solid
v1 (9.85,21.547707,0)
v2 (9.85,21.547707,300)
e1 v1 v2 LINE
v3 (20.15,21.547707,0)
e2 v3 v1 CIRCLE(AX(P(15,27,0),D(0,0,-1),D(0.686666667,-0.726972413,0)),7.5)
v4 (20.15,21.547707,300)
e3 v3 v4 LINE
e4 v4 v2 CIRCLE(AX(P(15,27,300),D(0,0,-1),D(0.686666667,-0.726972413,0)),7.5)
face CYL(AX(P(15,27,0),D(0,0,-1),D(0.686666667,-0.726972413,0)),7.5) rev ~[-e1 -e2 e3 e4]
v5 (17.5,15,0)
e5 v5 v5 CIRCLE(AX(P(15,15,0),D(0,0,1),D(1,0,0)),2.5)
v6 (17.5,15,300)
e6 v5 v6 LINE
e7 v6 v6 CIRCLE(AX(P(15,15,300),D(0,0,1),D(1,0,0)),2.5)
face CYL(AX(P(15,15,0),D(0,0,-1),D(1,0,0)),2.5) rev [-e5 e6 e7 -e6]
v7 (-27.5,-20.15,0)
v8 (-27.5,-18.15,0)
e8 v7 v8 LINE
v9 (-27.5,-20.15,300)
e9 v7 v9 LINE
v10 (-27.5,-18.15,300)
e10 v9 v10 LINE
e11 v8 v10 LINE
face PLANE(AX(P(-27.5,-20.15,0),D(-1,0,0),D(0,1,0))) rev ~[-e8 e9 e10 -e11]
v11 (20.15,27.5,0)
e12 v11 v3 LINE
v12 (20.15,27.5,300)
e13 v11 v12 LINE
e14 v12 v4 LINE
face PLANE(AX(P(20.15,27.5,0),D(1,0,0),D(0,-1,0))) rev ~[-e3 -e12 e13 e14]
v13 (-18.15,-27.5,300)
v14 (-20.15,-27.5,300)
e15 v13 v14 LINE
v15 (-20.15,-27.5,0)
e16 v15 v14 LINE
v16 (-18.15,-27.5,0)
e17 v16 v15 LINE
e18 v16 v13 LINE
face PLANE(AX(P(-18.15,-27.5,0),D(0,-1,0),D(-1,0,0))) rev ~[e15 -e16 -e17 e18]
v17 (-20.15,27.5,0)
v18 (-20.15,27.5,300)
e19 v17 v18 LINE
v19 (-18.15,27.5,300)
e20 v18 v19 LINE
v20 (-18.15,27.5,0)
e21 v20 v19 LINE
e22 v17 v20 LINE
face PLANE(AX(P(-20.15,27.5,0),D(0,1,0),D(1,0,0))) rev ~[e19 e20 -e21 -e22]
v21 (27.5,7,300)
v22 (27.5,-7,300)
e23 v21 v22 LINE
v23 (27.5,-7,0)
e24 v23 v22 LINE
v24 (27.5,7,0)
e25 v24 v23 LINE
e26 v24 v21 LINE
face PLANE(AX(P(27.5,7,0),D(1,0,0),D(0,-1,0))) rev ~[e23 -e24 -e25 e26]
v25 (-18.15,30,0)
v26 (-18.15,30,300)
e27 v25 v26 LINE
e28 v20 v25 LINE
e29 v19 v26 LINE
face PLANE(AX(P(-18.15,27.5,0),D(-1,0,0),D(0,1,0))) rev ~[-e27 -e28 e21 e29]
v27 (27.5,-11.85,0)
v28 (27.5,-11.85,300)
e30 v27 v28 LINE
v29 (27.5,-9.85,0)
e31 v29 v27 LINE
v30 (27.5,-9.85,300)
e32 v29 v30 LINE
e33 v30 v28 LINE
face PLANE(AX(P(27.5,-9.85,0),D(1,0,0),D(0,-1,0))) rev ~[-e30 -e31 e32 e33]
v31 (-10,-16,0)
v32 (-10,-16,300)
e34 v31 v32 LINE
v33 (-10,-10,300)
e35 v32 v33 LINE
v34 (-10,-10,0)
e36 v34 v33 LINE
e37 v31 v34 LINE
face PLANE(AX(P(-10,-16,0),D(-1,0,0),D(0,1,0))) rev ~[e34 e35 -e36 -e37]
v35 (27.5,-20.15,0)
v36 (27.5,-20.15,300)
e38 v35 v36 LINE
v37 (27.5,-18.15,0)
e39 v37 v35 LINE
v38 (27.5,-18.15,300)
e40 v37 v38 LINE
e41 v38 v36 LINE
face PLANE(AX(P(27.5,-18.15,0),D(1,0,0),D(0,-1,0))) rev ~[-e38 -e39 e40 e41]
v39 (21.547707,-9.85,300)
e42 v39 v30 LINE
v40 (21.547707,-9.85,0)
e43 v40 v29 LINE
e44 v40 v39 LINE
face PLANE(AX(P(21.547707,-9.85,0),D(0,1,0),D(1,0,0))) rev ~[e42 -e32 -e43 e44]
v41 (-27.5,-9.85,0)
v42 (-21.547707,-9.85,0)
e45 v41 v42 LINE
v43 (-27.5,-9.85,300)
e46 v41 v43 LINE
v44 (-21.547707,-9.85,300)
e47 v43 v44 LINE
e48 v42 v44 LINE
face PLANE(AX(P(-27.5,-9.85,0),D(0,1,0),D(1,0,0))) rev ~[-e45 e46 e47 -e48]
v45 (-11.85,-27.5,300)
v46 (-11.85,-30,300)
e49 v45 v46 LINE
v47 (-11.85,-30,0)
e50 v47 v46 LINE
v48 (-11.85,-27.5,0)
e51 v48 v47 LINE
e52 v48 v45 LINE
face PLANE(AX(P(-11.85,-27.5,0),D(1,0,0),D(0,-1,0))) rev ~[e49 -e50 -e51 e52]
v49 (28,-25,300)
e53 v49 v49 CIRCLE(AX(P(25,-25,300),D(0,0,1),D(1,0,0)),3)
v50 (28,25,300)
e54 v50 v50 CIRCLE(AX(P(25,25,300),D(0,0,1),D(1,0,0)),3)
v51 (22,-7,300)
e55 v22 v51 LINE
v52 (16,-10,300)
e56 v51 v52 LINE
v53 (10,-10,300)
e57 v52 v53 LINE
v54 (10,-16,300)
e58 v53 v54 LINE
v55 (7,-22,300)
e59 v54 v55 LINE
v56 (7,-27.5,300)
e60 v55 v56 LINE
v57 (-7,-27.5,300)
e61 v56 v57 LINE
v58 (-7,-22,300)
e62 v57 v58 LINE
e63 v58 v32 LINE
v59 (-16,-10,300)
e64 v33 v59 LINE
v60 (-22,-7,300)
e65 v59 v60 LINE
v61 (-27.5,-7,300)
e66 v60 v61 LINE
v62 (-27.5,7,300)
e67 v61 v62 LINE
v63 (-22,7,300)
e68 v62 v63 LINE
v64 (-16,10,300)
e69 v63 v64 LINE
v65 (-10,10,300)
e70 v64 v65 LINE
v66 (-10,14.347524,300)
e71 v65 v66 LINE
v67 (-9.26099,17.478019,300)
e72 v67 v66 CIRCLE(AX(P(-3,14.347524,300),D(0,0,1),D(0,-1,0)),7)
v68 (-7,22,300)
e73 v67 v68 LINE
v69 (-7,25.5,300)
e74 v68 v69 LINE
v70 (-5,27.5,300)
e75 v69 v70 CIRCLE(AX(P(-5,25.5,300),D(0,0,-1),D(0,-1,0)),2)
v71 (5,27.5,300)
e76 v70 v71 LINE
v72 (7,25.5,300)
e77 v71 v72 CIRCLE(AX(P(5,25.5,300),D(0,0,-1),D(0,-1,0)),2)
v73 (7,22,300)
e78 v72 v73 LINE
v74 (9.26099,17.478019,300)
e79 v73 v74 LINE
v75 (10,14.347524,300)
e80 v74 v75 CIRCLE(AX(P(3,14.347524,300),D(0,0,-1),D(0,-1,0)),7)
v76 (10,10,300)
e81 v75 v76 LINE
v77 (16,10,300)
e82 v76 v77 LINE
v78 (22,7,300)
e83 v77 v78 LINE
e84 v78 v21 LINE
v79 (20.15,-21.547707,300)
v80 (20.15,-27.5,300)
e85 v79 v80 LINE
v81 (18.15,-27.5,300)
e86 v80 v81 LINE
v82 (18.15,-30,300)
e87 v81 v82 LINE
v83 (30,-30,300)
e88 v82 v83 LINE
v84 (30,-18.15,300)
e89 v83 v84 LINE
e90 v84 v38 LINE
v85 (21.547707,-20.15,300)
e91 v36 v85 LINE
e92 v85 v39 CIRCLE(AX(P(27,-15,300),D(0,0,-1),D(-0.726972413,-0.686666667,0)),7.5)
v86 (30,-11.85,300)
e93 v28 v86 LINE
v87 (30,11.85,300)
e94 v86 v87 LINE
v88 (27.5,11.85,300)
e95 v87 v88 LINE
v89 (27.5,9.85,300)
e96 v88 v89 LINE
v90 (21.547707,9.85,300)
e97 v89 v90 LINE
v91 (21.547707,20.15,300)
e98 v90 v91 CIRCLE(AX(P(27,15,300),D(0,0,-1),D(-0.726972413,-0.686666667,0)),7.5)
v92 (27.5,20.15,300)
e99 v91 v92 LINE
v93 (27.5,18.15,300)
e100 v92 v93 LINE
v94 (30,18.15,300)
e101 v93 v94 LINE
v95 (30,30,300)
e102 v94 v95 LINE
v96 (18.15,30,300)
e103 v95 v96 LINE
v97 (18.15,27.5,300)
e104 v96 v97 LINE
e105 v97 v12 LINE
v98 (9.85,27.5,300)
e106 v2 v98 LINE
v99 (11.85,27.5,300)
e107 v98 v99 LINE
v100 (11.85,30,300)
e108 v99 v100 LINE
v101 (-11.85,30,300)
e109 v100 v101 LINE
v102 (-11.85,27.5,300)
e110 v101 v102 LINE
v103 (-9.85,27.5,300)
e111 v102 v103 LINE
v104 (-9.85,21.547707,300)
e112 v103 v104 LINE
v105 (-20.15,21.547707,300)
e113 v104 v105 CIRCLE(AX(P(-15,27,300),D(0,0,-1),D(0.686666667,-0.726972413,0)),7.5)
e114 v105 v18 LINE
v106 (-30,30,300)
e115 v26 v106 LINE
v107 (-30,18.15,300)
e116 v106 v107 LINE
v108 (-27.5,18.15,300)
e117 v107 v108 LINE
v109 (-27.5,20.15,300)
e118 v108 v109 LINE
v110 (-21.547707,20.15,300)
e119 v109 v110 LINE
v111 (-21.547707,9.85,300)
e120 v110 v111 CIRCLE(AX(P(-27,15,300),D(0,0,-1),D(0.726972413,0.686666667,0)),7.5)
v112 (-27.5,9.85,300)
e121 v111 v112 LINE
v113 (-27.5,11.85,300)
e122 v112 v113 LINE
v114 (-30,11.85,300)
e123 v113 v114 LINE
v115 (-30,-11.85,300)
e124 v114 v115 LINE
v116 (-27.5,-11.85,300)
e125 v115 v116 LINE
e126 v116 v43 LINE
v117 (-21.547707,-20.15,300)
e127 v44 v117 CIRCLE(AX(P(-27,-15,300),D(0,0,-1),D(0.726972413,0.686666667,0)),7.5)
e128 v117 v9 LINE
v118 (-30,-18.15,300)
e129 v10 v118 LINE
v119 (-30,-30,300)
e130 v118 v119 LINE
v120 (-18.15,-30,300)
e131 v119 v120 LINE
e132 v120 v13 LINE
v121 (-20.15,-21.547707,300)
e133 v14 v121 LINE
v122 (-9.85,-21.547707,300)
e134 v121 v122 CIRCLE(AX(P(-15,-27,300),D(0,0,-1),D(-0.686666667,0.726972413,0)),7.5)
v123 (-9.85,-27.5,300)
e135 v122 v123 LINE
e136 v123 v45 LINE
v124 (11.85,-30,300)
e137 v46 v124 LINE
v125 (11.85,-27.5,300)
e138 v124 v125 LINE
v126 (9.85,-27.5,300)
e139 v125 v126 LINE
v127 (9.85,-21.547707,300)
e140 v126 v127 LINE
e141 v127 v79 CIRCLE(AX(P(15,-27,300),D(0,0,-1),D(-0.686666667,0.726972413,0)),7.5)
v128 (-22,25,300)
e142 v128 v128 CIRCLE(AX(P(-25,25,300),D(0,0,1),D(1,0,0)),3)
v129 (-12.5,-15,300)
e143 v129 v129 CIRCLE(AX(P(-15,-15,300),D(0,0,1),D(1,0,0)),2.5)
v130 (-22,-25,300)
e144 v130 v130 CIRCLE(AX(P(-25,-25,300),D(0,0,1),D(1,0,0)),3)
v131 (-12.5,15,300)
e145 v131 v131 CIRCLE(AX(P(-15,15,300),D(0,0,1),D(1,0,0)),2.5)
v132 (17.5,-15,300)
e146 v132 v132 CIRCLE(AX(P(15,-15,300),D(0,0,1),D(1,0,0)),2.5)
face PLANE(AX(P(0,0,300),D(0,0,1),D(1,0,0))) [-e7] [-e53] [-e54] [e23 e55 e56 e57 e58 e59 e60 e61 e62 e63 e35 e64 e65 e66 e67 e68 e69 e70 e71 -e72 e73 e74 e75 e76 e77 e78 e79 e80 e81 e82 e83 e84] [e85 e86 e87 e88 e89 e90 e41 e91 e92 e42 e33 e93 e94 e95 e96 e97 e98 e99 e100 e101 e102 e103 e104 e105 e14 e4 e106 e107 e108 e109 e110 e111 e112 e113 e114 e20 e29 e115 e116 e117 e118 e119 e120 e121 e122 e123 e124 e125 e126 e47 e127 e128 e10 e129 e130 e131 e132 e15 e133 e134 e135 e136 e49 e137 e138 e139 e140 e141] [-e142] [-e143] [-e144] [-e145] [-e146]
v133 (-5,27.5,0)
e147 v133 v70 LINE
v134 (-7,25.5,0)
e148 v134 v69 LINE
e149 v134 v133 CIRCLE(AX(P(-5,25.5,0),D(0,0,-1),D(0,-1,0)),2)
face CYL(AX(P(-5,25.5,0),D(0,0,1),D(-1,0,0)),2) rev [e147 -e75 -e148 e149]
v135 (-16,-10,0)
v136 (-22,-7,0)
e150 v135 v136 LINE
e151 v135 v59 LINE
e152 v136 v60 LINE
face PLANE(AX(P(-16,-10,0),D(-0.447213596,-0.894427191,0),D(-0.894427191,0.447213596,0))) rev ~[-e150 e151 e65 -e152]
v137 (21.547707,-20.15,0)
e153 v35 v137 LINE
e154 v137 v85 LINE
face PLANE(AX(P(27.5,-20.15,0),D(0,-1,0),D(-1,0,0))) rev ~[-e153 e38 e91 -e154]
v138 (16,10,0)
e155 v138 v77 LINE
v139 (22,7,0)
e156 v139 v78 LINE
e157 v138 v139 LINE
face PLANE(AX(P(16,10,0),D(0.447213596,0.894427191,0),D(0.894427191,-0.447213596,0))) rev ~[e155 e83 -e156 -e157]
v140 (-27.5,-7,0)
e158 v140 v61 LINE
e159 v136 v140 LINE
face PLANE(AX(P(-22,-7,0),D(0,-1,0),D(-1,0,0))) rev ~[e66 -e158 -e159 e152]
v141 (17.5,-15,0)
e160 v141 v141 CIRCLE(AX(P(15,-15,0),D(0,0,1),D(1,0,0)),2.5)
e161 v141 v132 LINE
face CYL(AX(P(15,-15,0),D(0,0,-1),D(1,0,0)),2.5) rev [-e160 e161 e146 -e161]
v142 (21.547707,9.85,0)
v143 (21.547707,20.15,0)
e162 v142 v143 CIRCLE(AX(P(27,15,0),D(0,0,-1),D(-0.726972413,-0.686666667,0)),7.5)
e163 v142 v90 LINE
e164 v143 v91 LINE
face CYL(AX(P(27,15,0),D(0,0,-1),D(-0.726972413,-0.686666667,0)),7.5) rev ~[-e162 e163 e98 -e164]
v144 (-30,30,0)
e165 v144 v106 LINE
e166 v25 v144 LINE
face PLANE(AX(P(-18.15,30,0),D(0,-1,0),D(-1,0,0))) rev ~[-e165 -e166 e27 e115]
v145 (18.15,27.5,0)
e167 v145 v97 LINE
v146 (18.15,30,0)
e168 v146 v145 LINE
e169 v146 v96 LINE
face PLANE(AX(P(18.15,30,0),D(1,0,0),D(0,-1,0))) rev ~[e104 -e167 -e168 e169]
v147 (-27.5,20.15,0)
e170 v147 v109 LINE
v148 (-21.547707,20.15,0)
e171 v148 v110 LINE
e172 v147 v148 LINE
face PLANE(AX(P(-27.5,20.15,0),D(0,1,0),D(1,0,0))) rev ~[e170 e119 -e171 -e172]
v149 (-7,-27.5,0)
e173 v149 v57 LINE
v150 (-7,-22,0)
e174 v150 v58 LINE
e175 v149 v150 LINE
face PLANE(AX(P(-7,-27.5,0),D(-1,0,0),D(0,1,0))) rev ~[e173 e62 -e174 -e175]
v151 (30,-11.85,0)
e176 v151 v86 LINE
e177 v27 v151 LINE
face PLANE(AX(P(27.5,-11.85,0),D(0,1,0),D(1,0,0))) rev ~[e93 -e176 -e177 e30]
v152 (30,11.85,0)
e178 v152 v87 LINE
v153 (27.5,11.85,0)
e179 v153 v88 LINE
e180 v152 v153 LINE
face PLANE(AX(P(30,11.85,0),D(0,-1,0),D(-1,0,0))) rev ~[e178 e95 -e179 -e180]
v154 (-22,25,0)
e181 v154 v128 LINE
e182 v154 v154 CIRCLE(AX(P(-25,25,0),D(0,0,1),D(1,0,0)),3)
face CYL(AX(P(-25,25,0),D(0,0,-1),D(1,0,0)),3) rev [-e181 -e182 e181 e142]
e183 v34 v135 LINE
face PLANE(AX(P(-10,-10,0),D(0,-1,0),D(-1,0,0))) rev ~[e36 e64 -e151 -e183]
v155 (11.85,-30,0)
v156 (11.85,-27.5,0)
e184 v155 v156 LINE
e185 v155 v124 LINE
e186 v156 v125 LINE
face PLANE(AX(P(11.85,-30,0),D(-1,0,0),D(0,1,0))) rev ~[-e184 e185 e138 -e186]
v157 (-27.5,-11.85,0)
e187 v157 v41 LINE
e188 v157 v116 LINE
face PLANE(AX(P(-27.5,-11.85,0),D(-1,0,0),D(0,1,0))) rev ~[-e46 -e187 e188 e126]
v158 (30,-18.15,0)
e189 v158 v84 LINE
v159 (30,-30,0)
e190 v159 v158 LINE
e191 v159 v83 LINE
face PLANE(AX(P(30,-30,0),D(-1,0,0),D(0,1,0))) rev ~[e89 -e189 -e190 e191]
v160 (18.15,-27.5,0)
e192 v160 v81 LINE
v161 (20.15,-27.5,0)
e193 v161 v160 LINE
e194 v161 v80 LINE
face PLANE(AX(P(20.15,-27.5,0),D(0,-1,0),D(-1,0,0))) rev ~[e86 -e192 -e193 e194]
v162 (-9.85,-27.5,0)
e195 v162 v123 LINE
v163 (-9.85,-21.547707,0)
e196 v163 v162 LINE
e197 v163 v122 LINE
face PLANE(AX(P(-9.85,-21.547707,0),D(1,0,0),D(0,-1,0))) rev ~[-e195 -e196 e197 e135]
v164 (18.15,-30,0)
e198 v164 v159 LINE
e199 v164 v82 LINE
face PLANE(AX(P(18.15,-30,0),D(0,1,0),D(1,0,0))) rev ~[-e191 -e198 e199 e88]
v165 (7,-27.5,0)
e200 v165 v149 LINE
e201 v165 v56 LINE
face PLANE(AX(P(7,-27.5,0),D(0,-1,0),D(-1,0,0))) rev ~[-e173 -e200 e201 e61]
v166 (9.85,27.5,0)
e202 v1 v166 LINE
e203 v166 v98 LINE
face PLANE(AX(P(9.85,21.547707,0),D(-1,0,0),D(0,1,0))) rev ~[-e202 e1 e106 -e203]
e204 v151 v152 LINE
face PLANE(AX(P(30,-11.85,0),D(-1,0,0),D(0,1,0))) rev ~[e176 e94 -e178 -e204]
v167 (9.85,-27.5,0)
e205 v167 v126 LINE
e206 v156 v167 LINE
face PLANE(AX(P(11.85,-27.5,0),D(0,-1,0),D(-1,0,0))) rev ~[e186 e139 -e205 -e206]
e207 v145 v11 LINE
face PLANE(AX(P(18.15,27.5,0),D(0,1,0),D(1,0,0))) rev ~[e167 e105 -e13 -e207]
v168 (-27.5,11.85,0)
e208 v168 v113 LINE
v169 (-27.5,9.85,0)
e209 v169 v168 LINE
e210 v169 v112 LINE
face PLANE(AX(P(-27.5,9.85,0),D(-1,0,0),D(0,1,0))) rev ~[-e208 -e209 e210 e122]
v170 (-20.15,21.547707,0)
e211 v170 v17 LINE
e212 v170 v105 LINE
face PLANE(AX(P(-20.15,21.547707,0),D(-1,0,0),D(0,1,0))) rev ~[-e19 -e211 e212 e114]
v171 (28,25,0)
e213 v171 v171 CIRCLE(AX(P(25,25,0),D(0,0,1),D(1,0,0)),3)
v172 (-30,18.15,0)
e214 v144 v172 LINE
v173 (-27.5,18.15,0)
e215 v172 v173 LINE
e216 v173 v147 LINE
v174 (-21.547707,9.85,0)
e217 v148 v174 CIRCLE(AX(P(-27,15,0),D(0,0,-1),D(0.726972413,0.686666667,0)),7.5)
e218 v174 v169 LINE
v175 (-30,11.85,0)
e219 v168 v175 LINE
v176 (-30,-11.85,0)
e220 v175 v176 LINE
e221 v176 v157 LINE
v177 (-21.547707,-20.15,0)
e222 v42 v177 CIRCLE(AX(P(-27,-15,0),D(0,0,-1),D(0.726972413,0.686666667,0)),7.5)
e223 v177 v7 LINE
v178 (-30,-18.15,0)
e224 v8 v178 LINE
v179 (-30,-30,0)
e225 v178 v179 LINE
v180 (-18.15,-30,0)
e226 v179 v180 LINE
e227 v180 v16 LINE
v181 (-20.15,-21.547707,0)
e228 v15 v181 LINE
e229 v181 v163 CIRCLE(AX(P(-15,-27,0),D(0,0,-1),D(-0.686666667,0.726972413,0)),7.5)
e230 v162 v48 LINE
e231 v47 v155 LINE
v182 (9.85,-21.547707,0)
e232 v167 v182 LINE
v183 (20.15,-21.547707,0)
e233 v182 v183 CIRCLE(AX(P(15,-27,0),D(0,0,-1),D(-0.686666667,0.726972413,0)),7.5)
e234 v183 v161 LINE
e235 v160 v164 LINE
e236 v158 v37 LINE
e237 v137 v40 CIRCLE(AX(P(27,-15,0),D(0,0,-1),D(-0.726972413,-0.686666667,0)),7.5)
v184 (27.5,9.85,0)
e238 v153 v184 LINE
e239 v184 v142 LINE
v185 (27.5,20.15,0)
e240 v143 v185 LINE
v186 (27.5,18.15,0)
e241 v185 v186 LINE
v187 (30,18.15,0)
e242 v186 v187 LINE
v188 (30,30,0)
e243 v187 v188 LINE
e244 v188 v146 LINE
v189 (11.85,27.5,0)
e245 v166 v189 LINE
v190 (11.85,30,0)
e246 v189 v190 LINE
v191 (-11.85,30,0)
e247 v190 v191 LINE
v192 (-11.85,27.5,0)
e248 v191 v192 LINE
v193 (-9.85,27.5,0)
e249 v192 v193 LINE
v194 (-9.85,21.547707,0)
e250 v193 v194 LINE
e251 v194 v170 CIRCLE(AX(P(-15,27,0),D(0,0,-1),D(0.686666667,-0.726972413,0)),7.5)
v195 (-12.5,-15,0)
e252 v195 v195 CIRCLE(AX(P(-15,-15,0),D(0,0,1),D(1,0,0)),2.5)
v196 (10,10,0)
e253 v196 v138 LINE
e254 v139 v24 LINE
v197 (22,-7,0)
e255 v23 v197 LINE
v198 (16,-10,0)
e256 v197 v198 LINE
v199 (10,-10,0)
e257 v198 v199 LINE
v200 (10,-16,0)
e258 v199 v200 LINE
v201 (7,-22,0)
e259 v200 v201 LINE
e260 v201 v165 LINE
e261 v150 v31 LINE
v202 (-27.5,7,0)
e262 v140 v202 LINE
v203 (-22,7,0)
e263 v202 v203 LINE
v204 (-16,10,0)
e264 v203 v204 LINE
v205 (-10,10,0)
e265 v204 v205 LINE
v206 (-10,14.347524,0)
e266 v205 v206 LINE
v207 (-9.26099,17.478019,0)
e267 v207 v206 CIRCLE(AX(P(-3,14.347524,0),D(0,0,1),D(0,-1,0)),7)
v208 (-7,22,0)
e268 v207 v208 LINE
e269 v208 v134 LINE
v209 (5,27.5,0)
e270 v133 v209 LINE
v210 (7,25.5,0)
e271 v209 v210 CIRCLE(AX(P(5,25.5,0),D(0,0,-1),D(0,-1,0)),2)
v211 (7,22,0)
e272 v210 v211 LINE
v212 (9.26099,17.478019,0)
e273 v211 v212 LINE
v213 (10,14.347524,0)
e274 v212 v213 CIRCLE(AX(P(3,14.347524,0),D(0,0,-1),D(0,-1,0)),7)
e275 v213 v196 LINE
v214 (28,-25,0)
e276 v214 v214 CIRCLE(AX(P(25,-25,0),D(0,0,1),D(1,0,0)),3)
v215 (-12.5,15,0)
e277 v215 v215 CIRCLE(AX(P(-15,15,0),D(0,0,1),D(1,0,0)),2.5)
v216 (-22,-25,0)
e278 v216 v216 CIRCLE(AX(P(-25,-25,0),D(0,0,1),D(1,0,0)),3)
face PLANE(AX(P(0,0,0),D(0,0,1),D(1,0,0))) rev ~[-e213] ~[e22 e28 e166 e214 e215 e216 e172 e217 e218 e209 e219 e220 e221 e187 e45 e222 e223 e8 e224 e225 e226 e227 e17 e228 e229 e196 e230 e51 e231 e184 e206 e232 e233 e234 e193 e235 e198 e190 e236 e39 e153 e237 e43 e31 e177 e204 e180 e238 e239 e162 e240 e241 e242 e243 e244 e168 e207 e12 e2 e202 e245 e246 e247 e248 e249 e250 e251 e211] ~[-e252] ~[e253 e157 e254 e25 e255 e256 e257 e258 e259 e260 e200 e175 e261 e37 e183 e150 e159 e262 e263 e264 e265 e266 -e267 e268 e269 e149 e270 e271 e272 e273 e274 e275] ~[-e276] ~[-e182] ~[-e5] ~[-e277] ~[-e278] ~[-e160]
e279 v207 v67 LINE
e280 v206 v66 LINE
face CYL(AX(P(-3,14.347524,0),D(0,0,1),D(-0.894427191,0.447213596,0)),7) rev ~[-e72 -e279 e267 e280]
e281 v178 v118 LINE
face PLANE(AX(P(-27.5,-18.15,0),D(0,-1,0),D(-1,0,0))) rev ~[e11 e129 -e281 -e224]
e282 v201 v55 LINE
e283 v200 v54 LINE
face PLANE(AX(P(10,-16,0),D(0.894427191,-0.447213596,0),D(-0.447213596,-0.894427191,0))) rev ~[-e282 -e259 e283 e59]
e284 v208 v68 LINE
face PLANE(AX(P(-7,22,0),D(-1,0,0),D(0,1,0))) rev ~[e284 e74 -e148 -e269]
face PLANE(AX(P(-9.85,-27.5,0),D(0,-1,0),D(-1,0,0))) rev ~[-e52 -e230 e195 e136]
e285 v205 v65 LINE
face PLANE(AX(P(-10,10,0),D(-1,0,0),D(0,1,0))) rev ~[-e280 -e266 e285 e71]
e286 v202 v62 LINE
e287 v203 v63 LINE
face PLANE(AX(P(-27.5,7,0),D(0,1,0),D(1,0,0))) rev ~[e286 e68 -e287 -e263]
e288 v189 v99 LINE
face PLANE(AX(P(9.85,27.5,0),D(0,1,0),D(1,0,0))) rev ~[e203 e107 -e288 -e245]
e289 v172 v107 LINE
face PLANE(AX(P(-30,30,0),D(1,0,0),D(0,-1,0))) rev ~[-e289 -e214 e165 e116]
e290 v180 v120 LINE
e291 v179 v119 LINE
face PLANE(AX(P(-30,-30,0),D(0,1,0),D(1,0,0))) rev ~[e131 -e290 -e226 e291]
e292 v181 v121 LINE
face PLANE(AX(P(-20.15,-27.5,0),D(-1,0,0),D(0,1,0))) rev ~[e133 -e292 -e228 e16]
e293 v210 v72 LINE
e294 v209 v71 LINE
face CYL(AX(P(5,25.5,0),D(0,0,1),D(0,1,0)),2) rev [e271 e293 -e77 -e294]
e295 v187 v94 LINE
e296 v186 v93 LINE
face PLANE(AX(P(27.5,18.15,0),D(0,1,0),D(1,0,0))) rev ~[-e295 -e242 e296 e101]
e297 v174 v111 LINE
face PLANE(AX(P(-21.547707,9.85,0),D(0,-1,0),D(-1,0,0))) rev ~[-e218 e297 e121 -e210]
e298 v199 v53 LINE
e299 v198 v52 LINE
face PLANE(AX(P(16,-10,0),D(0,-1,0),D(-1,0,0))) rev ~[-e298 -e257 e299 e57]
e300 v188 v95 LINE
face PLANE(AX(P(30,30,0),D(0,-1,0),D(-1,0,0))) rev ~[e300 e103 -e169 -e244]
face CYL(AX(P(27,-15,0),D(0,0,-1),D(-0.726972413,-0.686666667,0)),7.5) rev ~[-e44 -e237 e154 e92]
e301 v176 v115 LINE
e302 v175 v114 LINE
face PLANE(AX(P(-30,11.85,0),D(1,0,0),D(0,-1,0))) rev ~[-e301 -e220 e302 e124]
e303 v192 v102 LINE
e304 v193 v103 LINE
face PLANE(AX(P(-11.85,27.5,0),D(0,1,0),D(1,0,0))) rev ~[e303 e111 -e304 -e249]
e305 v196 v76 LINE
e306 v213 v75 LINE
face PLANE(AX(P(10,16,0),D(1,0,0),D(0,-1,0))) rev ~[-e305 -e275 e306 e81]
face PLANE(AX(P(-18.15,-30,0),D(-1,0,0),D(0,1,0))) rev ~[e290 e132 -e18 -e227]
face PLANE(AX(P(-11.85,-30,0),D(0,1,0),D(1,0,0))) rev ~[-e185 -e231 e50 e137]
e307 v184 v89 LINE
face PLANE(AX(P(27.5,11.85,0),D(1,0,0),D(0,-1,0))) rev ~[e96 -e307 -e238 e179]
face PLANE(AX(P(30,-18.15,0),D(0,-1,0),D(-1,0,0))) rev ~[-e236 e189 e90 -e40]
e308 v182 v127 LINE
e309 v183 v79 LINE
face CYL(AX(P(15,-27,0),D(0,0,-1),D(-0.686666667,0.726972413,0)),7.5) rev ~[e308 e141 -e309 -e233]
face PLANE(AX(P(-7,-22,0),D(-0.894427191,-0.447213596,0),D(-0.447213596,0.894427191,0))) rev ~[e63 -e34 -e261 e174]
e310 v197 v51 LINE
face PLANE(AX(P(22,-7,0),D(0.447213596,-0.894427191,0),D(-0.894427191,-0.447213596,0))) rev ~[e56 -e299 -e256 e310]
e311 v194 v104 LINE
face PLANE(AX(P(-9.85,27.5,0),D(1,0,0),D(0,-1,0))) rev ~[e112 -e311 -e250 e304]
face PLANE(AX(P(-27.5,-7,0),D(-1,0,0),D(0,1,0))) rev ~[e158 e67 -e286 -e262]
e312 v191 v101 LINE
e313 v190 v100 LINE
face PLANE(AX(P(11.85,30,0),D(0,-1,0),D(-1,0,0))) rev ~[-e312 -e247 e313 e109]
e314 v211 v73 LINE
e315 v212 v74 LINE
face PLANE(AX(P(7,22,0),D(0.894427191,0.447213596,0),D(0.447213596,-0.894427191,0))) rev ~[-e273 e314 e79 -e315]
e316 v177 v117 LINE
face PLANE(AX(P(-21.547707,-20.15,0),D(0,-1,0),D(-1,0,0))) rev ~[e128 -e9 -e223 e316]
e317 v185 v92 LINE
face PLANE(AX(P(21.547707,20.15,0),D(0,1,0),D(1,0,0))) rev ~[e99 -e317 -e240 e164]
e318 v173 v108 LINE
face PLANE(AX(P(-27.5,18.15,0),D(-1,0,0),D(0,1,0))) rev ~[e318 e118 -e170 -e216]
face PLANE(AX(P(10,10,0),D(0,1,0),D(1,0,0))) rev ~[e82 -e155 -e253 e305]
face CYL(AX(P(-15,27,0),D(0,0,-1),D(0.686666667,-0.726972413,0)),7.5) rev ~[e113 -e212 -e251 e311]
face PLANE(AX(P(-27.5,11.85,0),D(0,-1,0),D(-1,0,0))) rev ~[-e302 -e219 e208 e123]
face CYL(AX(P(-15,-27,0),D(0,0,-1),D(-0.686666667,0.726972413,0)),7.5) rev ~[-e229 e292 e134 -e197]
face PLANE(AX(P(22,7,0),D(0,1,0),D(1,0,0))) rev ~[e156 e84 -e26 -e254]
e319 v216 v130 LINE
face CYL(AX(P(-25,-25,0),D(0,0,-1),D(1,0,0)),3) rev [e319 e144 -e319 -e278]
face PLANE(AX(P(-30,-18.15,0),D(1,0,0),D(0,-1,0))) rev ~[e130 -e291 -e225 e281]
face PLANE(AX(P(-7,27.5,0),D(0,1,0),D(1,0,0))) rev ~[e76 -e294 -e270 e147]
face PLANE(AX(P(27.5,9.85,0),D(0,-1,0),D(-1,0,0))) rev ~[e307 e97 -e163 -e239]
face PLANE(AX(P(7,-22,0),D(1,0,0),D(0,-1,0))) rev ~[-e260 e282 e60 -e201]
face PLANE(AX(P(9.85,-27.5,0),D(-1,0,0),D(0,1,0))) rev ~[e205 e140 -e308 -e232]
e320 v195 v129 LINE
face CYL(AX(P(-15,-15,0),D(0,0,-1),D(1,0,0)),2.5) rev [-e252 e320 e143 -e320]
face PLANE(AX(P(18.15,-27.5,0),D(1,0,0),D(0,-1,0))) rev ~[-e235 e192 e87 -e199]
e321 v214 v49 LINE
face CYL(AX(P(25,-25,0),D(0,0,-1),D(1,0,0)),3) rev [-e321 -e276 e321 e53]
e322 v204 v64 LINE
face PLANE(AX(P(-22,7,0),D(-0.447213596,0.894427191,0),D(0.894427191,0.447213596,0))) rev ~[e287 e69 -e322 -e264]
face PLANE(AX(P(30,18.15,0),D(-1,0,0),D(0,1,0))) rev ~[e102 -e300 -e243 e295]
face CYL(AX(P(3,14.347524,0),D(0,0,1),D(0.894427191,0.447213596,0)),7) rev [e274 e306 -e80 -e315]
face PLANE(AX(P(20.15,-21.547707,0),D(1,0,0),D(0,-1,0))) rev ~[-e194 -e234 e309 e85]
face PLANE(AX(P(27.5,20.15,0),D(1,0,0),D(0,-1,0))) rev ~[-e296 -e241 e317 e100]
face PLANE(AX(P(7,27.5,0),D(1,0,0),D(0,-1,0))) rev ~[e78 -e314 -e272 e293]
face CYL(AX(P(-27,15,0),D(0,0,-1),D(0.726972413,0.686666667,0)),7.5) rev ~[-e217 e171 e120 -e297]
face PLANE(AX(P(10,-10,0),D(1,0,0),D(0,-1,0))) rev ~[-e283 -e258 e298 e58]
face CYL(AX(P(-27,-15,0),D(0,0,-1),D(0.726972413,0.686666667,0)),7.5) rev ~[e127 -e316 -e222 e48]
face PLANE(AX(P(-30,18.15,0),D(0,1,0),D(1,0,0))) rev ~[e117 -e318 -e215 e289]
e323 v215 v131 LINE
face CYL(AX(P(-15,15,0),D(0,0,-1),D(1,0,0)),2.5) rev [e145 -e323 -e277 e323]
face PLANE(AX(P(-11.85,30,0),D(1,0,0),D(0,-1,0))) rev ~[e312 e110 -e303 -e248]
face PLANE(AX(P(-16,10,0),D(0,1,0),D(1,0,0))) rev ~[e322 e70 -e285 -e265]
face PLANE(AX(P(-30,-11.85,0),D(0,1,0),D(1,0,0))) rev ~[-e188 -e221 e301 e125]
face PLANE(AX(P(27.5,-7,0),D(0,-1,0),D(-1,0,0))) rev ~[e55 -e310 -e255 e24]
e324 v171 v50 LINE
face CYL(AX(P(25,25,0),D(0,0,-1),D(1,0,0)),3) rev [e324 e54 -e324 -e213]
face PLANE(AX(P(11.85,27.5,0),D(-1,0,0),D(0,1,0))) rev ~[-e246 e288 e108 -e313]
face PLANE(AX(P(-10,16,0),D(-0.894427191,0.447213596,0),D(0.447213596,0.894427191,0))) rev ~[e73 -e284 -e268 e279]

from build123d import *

# Parameters (mm, degrees)
F0_R     = 3
F0_R_2   = 2.5
F1_DEPTH = 300
F2_R     = 2
F3_R     = 7


# Not quite as in the source:
# - a feature names something its author has since deleted; it is built from what else it names


with BuildPart() as f1:
    # F0 (on Top) → F1 (new body)
    with BuildSketch(Plane.XY):
        with BuildLine():
            Line((18.15, -30), (30, -30))
            Line((30, -30), (30, -18.15))
            Line((30, -18.15), (27.5, -18.15))
            Line((27.5, -18.15), (27.5, -20.15))
            Line((27.5, -20.15), (21.5477069044, -20.15))
            ThreePointArc((21.5477069044, -20.15), (19.5, -15), (21.5477069044, -9.85))
            Line((21.5477069044, -9.85), (27.5, -9.85))
            Line((27.5, -9.85), (27.5, -11.85))
            Line((27.5, -11.85), (30, -11.85))
            Line((30, -11.85), (30, 11.85))
            Line((30, 11.85), (27.5, 11.85))
            Line((27.5, 11.85), (27.5, 9.85))
            Line((27.5, 9.85), (21.5477069044, 9.85))
            ThreePointArc((21.5477069044, 9.85), (19.5, 15), (21.5477069044, 20.15))
            Line((21.5477069044, 20.15), (27.5, 20.15))
            Line((27.5, 20.15), (27.5, 18.15))
            Line((27.5, 18.15), (30, 18.15))
            Line((30, 18.15), (30, 30))
            Line((30, 30), (18.15, 30))
            Line((18.15, 30), (18.15, 27.5))
            Line((18.15, 27.5), (20.15, 27.5))
            Line((20.15, 27.5), (20.15, 21.5477069044))
            ThreePointArc((20.15, 21.5477069044), (15, 19.5), (9.85, 21.5477069044))
            Line((9.85, 21.5477069044), (9.85, 27.5))
            Line((9.85, 27.5), (11.85, 27.5))
            Line((11.85, 27.5), (11.85, 30))
            Line((11.85, 30), (-11.85, 30))
            Line((-11.85, 30), (-11.85, 27.5))
            Line((-11.85, 27.5), (-9.85, 27.5))
            Line((-9.85, 27.5), (-9.85, 21.5477069044))
            ThreePointArc((-9.85, 21.5477069044), (-15, 19.5), (-20.15, 21.5477069044))
            Line((-20.15, 21.5477069044), (-20.15, 27.5))
            Line((-20.15, 27.5), (-18.15, 27.5))
            Line((-18.15, 27.5), (-18.15, 30))
            Line((-18.15, 30), (-30, 30))
            Line((-30, 30), (-30, 18.15))
            Line((-30, 18.15), (-27.5, 18.15))
            Line((-27.5, 18.15), (-27.5, 20.15))
            Line((-27.5, 20.15), (-21.5477069044, 20.15))
            ThreePointArc((-21.5477069044, 20.15), (-19.5, 15), (-21.5477069044, 9.85))
            Line((-21.5477069044, 9.85), (-27.5, 9.85))
            Line((-27.5, 9.85), (-27.5, 11.85))
            Line((-27.5, 11.85), (-30, 11.85))
            Line((-30, 11.85), (-30, -11.85))
            Line((-30, -11.85), (-27.5, -11.85))
            Line((-27.5, -11.85), (-27.5, -9.85))
            Line((-27.5, -9.85), (-21.5477069044, -9.85))
            ThreePointArc((-21.5477069044, -9.85), (-19.5, -15), (-21.5477069044, -20.15))
            Line((-21.5477069044, -20.15), (-27.5, -20.15))
            Line((-27.5, -20.15), (-27.5, -18.15))
            Line((-27.5, -18.15), (-30, -18.15))
            Line((-30, -18.15), (-30, -30))
            Line((-30, -30), (-18.15, -30))
            Line((-18.15, -30), (-18.15, -27.5))
            Line((-18.15, -27.5), (-20.15, -27.5))
            Line((-20.15, -27.5), (-20.15, -21.5477069044))
            ThreePointArc((-20.15, -21.5477069044), (-15, -19.5), (-9.85, -21.5477069044))
            Line((-9.85, -21.5477069044), (-9.85, -27.5))
            Line((-9.85, -27.5), (-11.85, -27.5))
            Line((-11.85, -27.5), (-11.85, -30))
            Line((-11.85, -30), (11.85, -30))
            Line((11.85, -30), (11.85, -27.5))
            Line((11.85, -27.5), (9.85, -27.5))
            Line((9.85, -27.5), (9.85, -21.5477069044))
            ThreePointArc((9.85, -21.5477069044), (15, -19.5), (20.15, -21.5477069044))
            Line((20.15, -21.5477069044), (20.15, -27.5))
            Line((20.15, -27.5), (18.15, -27.5))
            Line((18.15, -27.5), (18.15, -30))
        make_face()
        with Locations((-25, -25)):
            Circle(F0_R, mode=Mode.SUBTRACT)
        with Locations((-15, -15)):
            Circle(F0_R_2, mode=Mode.SUBTRACT)
        with Locations((25, -25)):
            Circle(F0_R, mode=Mode.SUBTRACT)
        with Locations((15, -15)):
            Circle(F0_R_2, mode=Mode.SUBTRACT)
        with Locations((-25, 25)):
            Circle(F0_R, mode=Mode.SUBTRACT)
        with Locations((-15, 15)):
            Circle(F0_R_2, mode=Mode.SUBTRACT)
        Polygon((-7, 22), (-7, 27.5), (0, 27.5), (7, 27.5), (7, 22), (10, 16), (10, 10), (16, 10), (22, 7), (27.5, 7), (27.5, 0), (27.5, -7), (22, -7), (16, -10), (10, -10), (10, -16), (7, -22), (7, -27.5), (0, -27.5), (-7, -27.5), (-7, -22), (-10, -16), (-10, -10), (-16, -10), (-22, -7), (-27.5, -7), (-27.5, 0), (-27.5, 7), (-22, 7), (-16, 10), (-10, 10), (-10, 16), align=None, mode=Mode.SUBTRACT)
        with Locations((15, 15)):
            Circle(F0_R_2, mode=Mode.SUBTRACT)
        with Locations((25, 25)):
            Circle(F0_R, mode=Mode.SUBTRACT)
    extrude(amount=F1_DEPTH)

    # F2
    f2_edges = [f1.edges().sort_by_distance(p)[0] for p in [
        (-7, 27.5, 150),
        (7, 27.5, 150),
    ]]
    fillet(f2_edges, radius=F2_R)

    # F3
    f3_edges = [f1.edges().sort_by_distance(p)[0] for p in [
        (-10, 16, 150),
        (10, 16, 150),
    ]]
    fillet(f3_edges, radius=F3_R)


solid = f1.part
